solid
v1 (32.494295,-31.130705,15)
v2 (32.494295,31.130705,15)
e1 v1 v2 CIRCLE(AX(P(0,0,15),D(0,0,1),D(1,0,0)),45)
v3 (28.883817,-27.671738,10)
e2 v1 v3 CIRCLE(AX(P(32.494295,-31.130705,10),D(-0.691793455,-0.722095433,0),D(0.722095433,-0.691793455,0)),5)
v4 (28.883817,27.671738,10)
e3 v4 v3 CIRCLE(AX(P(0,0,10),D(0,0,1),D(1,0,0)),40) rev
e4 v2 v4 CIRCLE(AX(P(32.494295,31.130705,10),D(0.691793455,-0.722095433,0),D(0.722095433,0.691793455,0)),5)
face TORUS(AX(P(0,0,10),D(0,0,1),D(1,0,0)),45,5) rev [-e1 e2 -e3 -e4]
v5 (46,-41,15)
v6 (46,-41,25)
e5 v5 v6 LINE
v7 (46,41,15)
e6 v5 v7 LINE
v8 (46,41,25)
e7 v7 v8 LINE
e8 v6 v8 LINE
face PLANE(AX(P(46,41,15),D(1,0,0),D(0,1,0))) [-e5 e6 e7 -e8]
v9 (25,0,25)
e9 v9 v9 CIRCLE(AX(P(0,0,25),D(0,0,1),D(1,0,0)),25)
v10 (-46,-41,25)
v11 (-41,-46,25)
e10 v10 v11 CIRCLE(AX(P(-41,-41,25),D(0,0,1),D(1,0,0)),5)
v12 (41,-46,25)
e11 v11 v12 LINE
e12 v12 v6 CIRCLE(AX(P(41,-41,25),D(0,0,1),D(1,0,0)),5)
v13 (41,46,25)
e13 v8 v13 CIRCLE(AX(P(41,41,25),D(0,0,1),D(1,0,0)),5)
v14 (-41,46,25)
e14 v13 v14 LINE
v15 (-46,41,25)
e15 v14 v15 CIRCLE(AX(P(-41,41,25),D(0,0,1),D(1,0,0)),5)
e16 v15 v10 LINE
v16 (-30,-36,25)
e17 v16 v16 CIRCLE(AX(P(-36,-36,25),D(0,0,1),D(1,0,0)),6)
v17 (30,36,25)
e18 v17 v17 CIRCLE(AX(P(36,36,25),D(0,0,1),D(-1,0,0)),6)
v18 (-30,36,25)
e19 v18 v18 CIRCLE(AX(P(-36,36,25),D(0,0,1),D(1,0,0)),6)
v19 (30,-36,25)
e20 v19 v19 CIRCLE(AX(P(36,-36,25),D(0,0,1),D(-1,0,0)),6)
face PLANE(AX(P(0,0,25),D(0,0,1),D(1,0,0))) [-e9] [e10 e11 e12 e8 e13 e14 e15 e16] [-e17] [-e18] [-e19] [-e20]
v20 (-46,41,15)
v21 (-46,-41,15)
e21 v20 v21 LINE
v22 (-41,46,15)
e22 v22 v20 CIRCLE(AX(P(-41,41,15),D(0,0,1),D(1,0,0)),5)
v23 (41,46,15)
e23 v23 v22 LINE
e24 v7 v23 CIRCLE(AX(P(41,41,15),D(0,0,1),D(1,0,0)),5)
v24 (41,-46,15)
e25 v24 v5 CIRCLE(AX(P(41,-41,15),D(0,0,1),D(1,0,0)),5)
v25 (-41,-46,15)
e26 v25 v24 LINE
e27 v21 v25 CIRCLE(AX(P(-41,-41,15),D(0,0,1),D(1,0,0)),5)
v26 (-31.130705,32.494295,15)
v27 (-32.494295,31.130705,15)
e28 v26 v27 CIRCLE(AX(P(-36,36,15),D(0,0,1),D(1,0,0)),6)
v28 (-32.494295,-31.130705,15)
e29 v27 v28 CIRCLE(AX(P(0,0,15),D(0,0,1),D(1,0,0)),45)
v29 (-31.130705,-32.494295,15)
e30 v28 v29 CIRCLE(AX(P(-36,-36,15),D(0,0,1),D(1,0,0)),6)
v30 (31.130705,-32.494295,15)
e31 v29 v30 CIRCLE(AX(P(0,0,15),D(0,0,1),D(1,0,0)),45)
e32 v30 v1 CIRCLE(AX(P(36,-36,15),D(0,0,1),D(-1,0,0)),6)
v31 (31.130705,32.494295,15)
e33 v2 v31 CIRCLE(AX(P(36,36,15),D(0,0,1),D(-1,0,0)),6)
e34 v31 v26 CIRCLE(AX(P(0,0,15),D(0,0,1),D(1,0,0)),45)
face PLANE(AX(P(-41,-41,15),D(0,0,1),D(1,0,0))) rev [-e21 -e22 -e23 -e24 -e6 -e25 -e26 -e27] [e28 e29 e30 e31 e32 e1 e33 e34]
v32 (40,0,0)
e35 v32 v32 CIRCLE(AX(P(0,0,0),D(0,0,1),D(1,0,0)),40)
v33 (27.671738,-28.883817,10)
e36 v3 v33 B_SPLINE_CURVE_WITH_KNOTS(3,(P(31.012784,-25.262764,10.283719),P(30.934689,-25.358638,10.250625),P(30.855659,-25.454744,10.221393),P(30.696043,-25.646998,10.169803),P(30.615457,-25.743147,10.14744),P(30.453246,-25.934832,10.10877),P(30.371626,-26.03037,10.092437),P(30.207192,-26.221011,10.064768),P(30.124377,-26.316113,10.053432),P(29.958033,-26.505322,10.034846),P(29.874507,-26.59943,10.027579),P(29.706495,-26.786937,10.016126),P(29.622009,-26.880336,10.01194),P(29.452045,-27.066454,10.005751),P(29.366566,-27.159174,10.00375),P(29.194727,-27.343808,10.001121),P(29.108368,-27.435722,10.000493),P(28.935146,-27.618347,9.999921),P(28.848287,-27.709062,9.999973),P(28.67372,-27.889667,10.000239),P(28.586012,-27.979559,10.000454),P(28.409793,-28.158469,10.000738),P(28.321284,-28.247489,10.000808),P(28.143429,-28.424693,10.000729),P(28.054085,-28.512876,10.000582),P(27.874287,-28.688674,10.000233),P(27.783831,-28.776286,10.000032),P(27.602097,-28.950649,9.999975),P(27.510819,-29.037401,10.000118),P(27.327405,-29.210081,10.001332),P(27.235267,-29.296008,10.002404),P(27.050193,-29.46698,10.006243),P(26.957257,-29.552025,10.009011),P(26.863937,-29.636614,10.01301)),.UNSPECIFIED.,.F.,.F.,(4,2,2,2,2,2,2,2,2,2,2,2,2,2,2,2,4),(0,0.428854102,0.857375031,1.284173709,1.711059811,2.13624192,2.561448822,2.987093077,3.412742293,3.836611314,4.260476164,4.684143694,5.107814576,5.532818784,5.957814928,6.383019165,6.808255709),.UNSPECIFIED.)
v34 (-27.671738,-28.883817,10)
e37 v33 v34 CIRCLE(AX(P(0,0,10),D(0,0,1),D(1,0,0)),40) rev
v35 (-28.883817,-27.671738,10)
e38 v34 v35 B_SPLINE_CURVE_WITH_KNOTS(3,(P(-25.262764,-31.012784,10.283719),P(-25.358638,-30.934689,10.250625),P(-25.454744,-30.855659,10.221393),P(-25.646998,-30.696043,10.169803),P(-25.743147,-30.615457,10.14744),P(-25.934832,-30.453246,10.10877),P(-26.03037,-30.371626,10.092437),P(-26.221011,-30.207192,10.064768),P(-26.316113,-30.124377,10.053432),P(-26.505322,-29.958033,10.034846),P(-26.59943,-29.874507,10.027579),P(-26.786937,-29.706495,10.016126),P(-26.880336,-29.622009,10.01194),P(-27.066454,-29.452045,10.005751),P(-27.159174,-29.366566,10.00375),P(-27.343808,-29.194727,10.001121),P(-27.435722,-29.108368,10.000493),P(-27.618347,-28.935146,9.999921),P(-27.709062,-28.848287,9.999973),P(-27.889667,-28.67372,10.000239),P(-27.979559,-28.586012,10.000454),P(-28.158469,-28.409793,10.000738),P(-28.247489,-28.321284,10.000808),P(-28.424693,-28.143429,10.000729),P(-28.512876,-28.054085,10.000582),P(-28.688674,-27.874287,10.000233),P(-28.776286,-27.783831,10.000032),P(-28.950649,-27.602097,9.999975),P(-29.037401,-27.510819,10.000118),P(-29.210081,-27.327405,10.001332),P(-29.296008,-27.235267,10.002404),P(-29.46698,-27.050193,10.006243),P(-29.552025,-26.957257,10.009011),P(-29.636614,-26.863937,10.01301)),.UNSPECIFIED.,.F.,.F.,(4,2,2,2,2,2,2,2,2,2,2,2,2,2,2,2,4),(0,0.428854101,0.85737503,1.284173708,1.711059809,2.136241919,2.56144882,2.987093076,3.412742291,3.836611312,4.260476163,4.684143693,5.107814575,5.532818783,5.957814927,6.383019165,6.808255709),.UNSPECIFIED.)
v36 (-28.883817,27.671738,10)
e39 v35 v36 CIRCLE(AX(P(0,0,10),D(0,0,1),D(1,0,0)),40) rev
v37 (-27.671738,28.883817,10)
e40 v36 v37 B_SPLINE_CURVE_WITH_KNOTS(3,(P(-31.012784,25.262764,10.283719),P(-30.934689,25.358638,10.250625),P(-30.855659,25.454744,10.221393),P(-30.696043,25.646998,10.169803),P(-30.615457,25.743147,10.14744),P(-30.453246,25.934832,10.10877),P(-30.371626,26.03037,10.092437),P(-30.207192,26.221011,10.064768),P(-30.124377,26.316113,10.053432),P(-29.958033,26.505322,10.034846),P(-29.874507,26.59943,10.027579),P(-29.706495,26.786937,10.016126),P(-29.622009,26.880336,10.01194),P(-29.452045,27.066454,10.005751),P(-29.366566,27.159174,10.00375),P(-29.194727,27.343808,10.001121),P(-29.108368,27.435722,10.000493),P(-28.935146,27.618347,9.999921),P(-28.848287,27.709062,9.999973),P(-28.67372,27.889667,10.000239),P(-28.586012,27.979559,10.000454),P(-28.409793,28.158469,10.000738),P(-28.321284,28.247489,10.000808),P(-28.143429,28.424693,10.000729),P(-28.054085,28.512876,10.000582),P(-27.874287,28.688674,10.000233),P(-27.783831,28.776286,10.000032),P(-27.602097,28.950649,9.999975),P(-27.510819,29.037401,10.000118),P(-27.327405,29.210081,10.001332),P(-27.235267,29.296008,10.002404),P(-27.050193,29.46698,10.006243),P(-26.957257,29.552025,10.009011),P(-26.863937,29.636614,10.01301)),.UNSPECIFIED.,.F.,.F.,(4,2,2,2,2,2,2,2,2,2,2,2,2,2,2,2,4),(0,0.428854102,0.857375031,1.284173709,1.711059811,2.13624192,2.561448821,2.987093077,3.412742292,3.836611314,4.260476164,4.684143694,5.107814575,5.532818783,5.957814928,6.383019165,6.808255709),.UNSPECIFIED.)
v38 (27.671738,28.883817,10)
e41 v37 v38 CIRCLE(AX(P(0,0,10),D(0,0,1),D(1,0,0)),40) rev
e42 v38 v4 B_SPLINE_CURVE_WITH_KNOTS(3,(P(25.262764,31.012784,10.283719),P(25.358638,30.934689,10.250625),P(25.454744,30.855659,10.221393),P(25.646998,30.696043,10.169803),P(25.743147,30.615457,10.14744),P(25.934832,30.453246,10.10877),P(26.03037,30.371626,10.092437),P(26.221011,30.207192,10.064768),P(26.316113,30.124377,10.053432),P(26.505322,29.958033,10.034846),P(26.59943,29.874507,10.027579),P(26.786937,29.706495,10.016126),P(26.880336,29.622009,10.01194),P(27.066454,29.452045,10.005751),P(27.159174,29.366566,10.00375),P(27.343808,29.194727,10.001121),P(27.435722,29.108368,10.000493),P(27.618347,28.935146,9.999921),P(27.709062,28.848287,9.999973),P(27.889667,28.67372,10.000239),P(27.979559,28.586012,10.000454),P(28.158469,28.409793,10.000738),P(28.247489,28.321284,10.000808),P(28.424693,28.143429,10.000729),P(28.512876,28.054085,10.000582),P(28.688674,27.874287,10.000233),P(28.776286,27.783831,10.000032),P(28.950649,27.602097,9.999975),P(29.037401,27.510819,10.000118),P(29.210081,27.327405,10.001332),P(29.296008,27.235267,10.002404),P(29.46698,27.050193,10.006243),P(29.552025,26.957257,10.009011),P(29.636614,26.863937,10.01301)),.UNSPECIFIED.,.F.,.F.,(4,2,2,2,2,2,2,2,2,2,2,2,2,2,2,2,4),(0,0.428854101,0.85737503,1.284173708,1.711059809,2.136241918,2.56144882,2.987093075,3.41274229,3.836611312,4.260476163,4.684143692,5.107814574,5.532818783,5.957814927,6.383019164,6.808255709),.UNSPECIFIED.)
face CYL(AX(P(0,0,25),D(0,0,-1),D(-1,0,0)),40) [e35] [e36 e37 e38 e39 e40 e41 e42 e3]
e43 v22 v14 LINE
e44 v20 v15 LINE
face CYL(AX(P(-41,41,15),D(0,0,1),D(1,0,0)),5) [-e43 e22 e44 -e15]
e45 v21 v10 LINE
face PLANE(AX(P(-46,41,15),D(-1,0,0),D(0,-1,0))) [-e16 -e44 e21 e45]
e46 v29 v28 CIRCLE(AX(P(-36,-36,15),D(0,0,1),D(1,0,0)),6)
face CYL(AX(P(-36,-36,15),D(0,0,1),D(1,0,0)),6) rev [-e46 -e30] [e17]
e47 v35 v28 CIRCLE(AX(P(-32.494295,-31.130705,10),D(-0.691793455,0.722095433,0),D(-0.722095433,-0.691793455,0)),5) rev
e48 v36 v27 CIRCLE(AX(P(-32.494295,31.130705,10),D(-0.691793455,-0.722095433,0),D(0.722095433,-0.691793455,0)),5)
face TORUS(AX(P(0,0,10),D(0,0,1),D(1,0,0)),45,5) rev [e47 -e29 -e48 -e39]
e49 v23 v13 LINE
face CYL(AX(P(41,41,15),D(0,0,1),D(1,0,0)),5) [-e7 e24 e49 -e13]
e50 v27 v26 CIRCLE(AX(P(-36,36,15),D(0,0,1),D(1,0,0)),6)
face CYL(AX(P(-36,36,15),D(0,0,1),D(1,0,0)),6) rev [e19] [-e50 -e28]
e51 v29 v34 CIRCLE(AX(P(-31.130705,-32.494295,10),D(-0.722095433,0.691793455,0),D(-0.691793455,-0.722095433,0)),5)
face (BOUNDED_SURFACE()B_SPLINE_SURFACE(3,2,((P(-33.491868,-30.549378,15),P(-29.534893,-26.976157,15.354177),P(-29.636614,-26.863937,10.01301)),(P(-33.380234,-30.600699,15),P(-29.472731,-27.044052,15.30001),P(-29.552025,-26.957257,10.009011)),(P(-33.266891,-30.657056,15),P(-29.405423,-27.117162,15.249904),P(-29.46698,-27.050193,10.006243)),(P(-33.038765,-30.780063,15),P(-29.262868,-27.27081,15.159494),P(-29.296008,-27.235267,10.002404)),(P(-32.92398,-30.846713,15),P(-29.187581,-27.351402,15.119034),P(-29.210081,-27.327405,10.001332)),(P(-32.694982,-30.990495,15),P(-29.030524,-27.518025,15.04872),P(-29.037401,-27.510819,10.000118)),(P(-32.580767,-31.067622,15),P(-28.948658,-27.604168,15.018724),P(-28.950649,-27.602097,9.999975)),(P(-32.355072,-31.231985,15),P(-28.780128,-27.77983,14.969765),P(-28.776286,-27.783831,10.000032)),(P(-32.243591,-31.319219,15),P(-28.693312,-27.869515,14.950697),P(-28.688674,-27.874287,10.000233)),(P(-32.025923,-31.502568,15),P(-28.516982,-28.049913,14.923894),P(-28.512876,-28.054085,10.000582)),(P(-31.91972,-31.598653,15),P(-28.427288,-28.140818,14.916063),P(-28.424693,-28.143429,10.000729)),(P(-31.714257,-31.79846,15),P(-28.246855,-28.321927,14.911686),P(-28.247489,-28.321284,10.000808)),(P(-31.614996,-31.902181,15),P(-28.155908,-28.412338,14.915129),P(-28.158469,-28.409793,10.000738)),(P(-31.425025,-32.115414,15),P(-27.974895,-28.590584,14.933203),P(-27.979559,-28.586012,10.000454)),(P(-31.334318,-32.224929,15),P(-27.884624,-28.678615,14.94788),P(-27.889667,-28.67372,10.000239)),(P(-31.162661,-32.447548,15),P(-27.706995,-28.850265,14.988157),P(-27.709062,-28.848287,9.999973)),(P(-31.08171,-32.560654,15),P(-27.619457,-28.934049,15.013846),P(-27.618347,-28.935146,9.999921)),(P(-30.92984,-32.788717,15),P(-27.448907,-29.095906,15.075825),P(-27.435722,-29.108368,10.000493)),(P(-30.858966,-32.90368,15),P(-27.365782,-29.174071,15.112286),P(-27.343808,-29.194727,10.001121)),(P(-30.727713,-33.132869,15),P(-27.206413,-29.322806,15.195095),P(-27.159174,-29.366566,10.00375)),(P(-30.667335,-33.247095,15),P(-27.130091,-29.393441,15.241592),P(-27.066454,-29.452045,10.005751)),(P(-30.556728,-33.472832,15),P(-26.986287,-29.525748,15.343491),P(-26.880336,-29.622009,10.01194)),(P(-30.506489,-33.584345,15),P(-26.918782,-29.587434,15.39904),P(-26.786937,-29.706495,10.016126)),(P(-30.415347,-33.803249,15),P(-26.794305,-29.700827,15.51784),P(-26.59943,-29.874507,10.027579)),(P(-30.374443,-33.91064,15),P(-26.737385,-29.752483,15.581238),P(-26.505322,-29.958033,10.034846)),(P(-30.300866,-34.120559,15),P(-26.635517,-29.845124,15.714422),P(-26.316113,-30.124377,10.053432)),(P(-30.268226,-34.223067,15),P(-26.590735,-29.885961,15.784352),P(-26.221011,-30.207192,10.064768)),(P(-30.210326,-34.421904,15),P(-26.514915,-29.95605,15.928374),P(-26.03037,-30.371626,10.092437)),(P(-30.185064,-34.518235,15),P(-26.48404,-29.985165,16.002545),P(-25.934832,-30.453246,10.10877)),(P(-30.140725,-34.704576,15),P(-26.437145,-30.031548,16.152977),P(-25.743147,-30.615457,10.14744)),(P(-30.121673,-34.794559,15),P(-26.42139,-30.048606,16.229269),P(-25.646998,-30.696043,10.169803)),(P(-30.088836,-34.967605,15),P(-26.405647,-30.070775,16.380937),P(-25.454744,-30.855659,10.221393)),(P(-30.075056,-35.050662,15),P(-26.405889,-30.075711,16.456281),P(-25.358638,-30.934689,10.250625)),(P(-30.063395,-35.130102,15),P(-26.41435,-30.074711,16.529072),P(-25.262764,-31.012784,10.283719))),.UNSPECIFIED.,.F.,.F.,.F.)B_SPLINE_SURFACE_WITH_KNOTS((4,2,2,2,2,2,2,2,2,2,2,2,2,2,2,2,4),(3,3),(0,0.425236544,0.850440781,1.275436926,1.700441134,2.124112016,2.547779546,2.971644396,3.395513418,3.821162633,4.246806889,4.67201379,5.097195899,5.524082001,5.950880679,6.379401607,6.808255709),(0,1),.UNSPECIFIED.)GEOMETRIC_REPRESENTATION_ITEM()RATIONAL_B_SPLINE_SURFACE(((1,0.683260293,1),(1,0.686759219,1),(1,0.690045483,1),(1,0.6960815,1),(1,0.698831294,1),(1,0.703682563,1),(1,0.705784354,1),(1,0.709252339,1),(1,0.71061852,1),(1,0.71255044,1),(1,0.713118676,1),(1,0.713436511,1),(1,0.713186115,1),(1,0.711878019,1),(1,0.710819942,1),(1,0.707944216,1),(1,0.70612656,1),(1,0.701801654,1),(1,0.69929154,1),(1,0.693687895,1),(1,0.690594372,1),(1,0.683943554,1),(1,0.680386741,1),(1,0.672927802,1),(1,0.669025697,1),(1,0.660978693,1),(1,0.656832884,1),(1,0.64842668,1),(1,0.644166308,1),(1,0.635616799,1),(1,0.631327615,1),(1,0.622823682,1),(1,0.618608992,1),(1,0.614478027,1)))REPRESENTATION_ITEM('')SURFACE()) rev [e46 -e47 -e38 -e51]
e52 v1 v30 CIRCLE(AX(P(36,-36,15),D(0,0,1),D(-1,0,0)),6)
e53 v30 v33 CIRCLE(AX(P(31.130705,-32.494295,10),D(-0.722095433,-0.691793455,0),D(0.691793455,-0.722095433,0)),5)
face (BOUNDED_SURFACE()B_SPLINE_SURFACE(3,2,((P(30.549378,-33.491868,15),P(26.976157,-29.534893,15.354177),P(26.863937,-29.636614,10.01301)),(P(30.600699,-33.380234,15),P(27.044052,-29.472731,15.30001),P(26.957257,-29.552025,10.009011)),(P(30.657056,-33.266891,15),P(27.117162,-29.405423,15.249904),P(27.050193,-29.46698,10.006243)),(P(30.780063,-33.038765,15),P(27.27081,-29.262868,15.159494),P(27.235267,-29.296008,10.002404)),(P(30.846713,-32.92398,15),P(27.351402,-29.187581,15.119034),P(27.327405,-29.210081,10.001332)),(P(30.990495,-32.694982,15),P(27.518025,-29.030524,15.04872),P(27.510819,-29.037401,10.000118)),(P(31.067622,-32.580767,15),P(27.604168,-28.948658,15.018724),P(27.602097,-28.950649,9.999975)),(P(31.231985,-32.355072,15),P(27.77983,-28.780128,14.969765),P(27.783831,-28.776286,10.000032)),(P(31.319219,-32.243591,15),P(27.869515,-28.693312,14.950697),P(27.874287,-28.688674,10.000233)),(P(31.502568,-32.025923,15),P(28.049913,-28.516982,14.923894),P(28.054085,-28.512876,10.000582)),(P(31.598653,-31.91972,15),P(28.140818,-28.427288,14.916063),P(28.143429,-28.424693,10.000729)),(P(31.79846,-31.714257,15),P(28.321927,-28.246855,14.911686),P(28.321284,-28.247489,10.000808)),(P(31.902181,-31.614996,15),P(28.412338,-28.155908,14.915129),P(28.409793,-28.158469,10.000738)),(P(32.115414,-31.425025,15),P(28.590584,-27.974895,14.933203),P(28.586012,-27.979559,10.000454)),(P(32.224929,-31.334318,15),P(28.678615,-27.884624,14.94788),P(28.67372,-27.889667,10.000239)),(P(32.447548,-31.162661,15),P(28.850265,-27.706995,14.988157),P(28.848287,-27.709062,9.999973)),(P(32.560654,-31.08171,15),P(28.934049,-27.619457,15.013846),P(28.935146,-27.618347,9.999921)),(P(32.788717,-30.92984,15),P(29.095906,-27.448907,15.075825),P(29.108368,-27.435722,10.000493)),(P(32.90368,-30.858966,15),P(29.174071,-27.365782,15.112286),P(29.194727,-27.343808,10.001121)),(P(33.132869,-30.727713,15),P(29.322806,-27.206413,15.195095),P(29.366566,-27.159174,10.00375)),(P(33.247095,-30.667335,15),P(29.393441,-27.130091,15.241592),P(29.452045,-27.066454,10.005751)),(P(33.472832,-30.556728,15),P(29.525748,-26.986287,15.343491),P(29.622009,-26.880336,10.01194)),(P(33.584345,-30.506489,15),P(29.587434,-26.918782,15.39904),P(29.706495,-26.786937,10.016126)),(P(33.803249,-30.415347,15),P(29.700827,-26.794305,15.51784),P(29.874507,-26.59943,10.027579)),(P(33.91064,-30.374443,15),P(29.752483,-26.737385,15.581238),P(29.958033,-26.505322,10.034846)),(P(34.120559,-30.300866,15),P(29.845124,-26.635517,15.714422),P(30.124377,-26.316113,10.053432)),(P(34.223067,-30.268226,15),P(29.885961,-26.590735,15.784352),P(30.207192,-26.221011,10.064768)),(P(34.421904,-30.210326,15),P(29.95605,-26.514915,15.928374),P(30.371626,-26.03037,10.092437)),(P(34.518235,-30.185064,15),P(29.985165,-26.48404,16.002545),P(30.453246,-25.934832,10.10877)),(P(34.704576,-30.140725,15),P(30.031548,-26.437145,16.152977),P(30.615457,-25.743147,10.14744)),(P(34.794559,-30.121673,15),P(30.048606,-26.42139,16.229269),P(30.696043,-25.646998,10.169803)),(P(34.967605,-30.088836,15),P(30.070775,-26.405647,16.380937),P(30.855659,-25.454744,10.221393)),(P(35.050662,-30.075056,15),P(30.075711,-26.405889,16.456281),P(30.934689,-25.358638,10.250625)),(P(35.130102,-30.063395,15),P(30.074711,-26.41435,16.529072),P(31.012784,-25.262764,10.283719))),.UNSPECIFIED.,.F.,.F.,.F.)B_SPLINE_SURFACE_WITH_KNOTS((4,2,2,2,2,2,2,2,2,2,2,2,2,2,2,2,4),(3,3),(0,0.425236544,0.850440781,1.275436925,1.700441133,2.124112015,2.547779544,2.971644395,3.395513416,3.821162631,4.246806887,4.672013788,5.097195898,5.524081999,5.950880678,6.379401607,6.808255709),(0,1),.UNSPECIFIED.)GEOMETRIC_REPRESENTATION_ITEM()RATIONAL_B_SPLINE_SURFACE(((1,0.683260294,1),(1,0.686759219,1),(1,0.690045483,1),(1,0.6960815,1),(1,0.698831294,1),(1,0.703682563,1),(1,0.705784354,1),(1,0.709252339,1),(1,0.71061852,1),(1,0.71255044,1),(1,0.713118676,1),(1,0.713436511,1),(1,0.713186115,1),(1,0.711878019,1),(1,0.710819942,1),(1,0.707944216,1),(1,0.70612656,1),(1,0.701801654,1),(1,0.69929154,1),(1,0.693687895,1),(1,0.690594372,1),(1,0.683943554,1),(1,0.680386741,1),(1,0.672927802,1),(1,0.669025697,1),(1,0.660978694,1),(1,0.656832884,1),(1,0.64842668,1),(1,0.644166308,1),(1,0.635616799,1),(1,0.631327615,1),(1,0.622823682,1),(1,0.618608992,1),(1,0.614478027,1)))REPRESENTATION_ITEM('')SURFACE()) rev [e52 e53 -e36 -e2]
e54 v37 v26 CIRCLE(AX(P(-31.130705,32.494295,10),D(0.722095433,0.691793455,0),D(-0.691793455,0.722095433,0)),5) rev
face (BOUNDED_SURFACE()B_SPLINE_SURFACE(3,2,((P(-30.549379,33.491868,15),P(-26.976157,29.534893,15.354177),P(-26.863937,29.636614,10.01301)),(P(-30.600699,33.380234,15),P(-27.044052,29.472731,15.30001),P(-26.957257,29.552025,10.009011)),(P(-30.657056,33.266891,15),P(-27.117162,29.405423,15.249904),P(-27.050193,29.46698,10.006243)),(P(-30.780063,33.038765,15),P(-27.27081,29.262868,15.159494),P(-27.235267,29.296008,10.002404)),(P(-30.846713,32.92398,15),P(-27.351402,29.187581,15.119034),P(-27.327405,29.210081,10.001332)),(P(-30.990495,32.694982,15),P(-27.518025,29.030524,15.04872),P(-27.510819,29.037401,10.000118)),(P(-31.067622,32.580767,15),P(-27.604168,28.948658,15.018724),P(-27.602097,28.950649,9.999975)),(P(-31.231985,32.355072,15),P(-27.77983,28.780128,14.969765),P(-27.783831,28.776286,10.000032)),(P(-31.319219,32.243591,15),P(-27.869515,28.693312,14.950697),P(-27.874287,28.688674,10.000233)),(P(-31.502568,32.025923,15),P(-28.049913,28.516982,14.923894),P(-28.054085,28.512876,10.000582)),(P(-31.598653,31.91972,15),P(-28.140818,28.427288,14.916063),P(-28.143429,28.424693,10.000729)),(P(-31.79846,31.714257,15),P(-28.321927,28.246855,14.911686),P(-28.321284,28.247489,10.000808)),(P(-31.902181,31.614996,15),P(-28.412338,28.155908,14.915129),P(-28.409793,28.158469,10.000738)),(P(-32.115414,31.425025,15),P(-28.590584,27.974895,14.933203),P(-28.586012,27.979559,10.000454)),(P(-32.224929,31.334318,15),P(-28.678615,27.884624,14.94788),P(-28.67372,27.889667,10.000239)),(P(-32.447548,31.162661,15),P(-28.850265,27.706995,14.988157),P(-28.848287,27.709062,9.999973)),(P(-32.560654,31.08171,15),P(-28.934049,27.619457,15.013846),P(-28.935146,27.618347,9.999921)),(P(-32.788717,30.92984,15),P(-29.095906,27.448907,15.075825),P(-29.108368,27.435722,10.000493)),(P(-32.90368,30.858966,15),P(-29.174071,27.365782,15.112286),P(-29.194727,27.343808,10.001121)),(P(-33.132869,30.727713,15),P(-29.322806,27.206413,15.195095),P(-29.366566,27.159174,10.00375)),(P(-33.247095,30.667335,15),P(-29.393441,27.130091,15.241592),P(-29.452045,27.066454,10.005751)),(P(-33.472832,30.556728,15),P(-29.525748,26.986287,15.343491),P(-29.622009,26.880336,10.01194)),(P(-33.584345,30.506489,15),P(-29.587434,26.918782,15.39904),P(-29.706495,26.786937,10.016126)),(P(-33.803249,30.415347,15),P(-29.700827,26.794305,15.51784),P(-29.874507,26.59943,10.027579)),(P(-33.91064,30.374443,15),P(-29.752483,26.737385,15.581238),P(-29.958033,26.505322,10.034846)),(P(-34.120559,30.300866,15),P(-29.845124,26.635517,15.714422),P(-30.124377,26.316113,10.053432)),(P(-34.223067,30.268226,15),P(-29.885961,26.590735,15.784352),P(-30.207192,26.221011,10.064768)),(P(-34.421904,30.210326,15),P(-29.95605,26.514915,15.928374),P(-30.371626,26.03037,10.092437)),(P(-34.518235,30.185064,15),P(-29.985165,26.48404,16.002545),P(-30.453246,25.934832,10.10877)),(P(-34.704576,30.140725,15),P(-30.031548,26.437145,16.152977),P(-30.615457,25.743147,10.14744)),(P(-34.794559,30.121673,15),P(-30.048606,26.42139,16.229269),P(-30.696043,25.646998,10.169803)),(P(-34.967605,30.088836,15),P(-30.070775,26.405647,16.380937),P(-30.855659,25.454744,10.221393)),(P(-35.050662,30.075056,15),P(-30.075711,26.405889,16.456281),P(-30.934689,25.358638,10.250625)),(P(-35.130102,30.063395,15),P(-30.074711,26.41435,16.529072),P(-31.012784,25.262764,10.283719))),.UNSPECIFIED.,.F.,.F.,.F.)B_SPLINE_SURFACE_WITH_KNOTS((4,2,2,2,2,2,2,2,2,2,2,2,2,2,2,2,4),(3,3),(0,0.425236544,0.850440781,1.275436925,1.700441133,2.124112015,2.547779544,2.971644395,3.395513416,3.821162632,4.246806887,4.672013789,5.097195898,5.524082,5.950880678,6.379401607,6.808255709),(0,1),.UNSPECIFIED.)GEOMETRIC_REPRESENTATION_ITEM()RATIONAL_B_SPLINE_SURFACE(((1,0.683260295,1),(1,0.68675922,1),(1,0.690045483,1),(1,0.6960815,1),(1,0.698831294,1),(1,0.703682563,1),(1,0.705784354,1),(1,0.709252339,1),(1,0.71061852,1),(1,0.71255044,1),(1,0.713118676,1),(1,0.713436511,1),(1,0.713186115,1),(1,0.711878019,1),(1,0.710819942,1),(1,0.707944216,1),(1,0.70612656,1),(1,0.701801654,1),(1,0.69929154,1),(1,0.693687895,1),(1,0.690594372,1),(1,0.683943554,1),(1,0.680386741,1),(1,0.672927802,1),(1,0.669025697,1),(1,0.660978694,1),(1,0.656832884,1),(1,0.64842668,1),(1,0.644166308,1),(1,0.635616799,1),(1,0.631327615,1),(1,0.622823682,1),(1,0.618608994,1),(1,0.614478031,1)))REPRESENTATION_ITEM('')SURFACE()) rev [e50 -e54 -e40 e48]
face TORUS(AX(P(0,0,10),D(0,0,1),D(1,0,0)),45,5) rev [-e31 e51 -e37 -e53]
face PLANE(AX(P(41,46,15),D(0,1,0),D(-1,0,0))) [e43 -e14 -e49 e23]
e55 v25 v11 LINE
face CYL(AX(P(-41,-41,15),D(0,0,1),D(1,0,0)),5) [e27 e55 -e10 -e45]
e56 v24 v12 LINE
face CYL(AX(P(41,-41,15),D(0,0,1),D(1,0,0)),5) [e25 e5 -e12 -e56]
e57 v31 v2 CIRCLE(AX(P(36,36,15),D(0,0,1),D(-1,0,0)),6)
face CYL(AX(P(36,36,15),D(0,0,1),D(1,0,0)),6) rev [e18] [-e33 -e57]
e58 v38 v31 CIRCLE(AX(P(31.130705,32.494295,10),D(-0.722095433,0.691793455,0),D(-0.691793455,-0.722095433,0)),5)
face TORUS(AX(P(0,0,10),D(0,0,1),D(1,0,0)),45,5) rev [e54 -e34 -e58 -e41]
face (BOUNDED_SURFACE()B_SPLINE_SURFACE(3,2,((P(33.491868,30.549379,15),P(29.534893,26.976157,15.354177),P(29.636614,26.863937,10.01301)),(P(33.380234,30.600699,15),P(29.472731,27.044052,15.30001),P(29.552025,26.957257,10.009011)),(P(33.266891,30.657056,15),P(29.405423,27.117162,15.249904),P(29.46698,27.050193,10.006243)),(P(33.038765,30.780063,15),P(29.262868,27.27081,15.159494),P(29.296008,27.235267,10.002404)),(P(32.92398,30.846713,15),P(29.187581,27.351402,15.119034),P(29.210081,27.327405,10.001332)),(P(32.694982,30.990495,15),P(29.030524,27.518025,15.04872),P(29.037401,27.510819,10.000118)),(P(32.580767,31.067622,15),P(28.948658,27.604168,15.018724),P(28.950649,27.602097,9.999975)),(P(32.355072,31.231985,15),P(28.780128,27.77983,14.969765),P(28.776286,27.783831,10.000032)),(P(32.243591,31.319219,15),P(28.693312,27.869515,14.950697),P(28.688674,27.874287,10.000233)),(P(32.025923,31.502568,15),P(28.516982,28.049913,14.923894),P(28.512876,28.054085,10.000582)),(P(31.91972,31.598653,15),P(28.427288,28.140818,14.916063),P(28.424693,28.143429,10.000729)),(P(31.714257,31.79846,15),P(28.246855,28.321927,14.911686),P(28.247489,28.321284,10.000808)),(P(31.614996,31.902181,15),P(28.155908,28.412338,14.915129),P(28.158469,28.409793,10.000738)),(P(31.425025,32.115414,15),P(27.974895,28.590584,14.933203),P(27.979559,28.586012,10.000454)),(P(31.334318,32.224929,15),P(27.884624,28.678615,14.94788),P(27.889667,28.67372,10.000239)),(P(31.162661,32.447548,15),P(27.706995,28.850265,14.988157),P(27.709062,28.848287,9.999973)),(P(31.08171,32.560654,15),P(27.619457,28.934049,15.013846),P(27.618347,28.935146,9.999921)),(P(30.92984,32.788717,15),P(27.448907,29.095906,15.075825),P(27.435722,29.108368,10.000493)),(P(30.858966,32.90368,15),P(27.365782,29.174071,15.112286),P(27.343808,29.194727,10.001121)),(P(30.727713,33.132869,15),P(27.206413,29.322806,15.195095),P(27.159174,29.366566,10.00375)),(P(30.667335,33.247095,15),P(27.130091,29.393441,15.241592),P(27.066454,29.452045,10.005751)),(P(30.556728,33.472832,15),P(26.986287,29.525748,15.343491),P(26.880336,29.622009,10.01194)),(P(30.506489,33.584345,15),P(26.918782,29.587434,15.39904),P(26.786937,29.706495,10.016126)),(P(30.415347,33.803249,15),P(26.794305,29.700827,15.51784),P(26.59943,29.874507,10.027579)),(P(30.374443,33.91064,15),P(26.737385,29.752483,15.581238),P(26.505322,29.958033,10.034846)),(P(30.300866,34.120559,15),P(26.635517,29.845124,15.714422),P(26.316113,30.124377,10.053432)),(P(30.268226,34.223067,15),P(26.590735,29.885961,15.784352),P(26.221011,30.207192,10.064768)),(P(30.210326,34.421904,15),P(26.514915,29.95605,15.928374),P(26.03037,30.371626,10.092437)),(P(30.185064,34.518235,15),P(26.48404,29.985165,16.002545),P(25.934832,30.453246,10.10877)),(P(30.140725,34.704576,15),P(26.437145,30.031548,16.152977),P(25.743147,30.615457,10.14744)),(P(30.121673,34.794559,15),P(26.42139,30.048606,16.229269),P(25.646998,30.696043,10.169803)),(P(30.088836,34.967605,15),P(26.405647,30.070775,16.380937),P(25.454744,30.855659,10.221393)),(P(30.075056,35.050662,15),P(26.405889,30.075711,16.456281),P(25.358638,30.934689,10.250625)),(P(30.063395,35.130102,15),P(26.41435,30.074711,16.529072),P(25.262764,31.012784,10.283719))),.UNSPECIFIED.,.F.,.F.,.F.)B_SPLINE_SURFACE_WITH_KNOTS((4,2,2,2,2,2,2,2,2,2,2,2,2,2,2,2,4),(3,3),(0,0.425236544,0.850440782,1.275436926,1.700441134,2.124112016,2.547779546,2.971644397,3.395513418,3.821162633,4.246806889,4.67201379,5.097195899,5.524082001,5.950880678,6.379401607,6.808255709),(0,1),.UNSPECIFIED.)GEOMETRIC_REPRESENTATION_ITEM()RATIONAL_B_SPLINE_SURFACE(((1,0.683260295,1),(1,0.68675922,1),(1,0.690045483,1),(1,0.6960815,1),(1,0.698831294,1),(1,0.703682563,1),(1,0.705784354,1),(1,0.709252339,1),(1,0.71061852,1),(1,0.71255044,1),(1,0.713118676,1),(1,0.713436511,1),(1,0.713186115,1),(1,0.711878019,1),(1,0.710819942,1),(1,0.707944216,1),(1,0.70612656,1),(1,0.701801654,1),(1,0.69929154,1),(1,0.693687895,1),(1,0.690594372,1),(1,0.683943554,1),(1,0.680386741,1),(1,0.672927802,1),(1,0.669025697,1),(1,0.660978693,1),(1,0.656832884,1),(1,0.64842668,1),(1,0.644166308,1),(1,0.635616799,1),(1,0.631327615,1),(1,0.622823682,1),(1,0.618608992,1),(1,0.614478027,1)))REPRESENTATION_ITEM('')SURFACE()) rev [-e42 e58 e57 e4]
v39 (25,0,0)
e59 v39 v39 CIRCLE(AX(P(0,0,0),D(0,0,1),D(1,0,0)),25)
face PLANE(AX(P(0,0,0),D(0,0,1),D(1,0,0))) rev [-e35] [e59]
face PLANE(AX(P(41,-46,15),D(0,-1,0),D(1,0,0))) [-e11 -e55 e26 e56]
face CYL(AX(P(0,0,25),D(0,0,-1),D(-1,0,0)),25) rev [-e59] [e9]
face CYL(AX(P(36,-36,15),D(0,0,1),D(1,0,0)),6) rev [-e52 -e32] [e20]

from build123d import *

# Parameters (mm, degrees)
ESQUISSE1_R        = 40
ESQUISSE1_R_2      = 25
BOSS_EXTRU_1_DEPTH = 25
BOSS_EXTRU_2_START = -10
ESQUISSE4_R        = 6
ESQUISSE4_R_2      = 25
BOSS_EXTRU_2_DEPTH = 10
CONG_1_R           = 5


with BuildPart() as part:
    # Esquisse1 → Boss.-Extru.1 (new body)
    with BuildSketch(Plane.XY):
        Circle(ESQUISSE1_R)
        Circle(ESQUISSE1_R_2, mode=Mode.SUBTRACT)
    extrude(amount=BOSS_EXTRU_1_DEPTH)

    # Esquisse4 → Boss.-Extru.2 (add)
    with BuildSketch(Plane.XY.offset(25).offset(BOSS_EXTRU_2_START)):
        with BuildLine():
            Line((41, 46), (-41, 46))
            ThreePointArc((-41, 46), (-44.535533906, 44.535533906), (-46, 41))
            Line((-46, 41), (-46, -41))
            ThreePointArc((-46, -41), (-44.535533906, -44.535533906), (-41, -46))
            Line((-41, -46), (41, -46))
            ThreePointArc((41, -46), (44.535533906, -44.535533906), (46, -41))
            Line((46, -41), (46, 41))
            ThreePointArc((46, 41), (44.535533906, 44.535533906), (41, 46))
        make_face()
        with Locations((-36, 36)):
            Circle(ESQUISSE4_R, mode=Mode.SUBTRACT)
        with Locations((-36, -36)):
            Circle(ESQUISSE4_R, mode=Mode.SUBTRACT)
        with Locations(Location((36, -36, 0), (0, 0, 180))):
            Circle(ESQUISSE4_R, mode=Mode.SUBTRACT)
        with Locations(Location((36, 36, 0), (0, 0, 180))):
            Circle(ESQUISSE4_R, mode=Mode.SUBTRACT)
        Circle(ESQUISSE4_R_2, mode=Mode.SUBTRACT)
    extrude(amount=BOSS_EXTRU_2_DEPTH)

    # Congé1
    # the kernel refuses this fillet: 5 mm, written as the material it adds along each edge
    with BuildSketch(Plane(origin=(0, 0, 15), x_dir=(1, 0, 0), z_dir=(0, 1, 0))) as cong_1_piece_1_section:
        with BuildLine():
            CenterArc((40 + CONG_1_R, CONG_1_R), CONG_1_R, 180, 90)
            Line((40 + CONG_1_R, 0), (40, 0))
            Line((40, 0), (40, CONG_1_R))
        make_face()
    cong_1_piece_1 = revolve(axis=Axis((0, 0, 15), (0, 0, -1)), mode=Mode.PRIVATE)
    cong_1_piece_1 = cong_1_piece_1 - Plane(origin=(36, 36, 13.61437319), x_dir=(-1, 0, 0), z_dir=(0, 0, -1)) * Cylinder(6, 180, mode=Mode.PRIVATE)
    cong_1_piece_1 = cong_1_piece_1 - Plane(origin=(-36, 36, 13.61437319), x_dir=(1, 0, 0), z_dir=(0, 0, -1)) * Cylinder(6, 180, mode=Mode.PRIVATE)
    cong_1_piece_1 = cong_1_piece_1 - Plane(origin=(36, -36, 13.61437319), x_dir=(-1, 0, 0), z_dir=(0, 0, -1)) * Cylinder(6, 180, mode=Mode.PRIVATE)
    cong_1_piece_1 = cong_1_piece_1 - Plane(origin=(-36, -36, 13.61437319), x_dir=(1, 0, 0), z_dir=(0, 0, -1)) * Cylinder(6, 180, mode=Mode.PRIVATE)
    add(cong_1_piece_1)


solid = part.part
